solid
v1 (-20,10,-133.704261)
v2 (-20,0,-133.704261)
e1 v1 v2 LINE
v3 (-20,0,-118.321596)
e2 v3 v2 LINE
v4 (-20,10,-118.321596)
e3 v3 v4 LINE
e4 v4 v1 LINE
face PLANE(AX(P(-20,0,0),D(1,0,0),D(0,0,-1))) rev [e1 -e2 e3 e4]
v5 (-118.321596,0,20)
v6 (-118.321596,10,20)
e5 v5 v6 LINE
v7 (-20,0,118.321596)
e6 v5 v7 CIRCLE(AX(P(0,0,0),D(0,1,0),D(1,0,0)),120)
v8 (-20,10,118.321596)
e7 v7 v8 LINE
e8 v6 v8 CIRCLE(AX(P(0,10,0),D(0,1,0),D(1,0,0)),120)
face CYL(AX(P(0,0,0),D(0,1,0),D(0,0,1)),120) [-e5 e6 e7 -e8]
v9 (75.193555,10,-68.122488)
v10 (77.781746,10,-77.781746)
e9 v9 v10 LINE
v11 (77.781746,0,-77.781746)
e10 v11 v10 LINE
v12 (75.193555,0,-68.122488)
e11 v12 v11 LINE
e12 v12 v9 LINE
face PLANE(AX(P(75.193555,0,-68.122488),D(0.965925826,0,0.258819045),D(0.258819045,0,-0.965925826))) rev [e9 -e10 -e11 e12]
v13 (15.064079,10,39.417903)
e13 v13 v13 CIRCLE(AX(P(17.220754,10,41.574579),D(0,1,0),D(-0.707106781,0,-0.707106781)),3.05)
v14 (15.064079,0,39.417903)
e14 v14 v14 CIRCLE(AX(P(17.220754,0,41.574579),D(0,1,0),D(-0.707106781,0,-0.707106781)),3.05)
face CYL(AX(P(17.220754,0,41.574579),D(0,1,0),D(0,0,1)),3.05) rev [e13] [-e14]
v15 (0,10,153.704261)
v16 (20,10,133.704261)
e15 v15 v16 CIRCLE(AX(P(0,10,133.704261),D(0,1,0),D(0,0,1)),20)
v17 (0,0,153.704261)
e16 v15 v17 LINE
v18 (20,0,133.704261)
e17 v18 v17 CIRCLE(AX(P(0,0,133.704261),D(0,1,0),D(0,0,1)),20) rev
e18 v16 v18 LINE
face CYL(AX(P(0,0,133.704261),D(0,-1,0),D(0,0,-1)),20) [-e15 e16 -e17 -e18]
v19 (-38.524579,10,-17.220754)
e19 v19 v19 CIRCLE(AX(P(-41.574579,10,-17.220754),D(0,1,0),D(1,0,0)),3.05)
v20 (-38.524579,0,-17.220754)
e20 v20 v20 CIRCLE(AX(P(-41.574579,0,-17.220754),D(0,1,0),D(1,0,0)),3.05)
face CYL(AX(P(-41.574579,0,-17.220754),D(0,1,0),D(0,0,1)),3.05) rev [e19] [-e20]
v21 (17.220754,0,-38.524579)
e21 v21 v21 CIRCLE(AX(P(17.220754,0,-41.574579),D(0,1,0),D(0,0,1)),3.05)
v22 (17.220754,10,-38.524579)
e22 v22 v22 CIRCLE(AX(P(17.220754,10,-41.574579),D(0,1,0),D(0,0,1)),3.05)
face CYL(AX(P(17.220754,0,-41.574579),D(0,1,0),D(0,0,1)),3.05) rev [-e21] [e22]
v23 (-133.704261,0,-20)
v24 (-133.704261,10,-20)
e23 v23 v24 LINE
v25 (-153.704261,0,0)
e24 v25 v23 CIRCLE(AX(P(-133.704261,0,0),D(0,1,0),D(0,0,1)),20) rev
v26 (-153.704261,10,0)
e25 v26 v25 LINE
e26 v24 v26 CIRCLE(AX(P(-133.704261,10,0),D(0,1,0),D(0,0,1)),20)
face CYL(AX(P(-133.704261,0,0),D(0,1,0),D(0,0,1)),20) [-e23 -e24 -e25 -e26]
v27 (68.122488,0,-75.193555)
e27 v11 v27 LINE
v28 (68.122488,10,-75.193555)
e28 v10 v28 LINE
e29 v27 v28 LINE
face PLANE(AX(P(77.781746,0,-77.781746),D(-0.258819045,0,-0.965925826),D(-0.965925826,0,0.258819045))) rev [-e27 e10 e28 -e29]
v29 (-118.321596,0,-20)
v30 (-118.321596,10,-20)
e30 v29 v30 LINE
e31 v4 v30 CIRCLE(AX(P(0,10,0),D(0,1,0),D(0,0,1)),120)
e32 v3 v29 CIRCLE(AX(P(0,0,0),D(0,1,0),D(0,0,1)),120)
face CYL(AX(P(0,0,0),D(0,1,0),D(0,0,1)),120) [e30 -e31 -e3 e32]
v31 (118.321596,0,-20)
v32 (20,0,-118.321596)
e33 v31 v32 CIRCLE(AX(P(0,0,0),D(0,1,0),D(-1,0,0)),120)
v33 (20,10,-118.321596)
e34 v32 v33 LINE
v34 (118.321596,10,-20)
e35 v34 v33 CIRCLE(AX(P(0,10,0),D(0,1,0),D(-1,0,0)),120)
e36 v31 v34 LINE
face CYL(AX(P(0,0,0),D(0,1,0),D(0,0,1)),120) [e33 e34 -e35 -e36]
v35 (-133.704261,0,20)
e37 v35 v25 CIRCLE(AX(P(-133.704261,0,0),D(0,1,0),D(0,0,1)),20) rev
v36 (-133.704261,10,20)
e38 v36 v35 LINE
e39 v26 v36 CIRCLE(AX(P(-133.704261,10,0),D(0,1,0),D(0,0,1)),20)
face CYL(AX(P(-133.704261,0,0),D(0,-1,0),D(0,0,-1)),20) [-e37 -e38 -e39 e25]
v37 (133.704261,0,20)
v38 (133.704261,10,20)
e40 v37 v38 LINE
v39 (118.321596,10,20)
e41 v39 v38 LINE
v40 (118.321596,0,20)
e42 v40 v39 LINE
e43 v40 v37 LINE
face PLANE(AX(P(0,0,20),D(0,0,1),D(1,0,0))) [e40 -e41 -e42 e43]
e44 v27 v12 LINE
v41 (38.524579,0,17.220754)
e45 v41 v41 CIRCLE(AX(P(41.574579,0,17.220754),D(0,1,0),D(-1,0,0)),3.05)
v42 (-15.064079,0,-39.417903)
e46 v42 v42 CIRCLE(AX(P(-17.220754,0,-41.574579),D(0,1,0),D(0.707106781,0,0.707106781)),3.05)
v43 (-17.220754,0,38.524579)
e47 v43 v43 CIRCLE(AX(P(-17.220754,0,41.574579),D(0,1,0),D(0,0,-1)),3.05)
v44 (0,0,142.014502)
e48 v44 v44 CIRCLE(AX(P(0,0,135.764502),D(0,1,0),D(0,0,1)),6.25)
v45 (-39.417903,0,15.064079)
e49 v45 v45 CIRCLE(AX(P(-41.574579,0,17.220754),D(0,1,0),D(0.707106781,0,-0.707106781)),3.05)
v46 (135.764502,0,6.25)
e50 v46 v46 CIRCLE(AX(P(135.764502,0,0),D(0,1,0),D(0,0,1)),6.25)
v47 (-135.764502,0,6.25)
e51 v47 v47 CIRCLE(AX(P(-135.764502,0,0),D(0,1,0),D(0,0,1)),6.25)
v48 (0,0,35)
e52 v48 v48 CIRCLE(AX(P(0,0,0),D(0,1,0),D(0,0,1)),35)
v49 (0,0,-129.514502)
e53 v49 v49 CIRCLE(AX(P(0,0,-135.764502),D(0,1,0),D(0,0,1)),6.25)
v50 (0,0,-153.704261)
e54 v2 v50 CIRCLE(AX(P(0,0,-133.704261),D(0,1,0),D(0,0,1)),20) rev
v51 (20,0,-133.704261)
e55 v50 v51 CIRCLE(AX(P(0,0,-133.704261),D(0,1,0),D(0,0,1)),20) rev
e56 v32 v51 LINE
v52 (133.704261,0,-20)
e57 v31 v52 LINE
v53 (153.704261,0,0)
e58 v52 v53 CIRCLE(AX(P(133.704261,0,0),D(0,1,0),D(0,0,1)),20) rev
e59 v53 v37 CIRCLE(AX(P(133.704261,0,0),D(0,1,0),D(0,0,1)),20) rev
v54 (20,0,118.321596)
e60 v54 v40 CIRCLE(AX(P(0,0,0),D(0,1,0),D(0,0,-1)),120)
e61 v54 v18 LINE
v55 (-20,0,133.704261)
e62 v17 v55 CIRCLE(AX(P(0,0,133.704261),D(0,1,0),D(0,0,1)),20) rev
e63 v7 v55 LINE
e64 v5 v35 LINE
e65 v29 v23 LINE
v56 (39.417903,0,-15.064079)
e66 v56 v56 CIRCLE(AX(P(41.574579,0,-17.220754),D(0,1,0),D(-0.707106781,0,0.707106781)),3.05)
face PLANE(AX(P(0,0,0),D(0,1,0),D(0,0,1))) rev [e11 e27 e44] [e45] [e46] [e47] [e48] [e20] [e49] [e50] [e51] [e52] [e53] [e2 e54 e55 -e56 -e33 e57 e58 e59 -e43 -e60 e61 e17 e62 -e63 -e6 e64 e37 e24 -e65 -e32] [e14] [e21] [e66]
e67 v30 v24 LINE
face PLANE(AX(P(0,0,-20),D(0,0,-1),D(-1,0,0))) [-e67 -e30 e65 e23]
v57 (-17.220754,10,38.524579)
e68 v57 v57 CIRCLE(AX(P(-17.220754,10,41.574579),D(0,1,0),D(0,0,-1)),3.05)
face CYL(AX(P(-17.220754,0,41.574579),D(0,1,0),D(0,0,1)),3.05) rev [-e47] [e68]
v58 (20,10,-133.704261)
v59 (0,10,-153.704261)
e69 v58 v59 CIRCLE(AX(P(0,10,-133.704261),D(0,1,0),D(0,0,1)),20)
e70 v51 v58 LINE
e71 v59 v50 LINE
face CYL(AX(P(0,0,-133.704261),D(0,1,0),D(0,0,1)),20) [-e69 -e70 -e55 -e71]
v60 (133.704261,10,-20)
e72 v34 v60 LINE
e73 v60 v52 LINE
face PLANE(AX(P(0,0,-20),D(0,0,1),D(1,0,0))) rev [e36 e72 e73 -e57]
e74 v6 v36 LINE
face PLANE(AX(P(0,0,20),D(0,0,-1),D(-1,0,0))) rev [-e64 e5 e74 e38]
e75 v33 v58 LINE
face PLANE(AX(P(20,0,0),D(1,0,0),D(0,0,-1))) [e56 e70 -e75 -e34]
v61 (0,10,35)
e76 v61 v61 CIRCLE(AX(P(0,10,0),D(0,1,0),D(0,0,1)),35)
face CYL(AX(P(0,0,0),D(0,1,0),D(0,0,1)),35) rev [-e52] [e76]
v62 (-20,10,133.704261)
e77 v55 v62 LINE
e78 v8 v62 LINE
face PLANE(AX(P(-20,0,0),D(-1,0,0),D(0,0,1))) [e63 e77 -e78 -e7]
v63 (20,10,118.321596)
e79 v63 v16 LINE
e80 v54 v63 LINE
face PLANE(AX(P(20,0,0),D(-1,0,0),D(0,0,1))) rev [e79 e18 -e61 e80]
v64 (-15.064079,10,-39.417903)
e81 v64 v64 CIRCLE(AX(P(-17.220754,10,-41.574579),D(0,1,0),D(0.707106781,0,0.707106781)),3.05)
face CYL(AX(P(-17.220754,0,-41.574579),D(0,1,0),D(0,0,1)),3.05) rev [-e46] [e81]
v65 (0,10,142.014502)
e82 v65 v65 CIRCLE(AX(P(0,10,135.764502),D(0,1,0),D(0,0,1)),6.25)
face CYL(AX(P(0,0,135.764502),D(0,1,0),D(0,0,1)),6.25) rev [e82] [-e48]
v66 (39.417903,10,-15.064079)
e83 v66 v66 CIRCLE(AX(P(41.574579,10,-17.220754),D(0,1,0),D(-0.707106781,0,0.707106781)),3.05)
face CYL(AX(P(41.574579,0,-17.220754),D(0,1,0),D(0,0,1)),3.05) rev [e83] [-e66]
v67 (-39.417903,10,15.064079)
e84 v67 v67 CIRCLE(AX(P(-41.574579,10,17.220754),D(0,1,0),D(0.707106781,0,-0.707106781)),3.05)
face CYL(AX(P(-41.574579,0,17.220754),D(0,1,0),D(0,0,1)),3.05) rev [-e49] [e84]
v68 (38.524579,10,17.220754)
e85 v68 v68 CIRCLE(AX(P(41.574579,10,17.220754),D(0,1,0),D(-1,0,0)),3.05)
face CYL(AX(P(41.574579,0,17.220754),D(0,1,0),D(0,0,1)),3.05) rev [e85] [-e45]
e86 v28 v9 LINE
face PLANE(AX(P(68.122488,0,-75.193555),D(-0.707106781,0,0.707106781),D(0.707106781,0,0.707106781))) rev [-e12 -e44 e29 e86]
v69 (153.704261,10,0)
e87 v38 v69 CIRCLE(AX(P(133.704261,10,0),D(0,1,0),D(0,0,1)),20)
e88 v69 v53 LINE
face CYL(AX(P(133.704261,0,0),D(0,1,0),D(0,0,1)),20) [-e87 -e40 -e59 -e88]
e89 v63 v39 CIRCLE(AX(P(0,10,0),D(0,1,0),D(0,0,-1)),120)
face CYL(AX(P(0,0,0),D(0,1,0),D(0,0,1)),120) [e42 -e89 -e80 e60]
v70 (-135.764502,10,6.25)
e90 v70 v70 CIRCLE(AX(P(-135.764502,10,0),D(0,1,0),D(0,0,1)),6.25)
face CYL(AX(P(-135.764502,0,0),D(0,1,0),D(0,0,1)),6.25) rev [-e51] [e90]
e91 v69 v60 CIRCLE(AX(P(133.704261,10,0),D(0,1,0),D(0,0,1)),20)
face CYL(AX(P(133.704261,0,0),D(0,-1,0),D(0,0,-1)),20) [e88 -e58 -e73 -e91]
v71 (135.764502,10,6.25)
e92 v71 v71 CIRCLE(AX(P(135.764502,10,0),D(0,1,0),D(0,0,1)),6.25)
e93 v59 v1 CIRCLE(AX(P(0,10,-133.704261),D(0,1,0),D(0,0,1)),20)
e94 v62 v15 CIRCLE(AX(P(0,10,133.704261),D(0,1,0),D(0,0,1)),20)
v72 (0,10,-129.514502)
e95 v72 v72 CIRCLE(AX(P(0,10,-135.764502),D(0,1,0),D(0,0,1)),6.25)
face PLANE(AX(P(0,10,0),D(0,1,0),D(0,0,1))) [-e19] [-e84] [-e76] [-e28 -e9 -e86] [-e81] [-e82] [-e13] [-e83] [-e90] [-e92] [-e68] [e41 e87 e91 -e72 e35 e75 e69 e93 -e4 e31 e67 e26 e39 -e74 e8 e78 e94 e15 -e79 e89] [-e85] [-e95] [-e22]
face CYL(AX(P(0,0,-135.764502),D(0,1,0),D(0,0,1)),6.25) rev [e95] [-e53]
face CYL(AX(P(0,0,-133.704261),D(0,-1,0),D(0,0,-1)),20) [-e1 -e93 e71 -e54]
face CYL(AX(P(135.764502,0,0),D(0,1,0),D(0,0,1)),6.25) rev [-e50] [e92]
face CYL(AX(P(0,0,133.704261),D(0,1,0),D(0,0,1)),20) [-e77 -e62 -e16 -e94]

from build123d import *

# Parameters (mm, degrees)
SKETCH1_R           = 155
BOSS_EXTRUDE1_DEPTH = 10
SKETCH2_R           = 6.25
CUT_EXTRUDE1_DEPTH  = 220.431082575
SKETCH3_R           = 35
CUT_EXTRUDE2_DEPTH  = 220.431082575
SKETCH4_R           = 3.05
CUT_EXTRUDE3_DEPTH  = 220.431082575
CIRPATTERN1_COUNT   = 8
CUT_EXTRUDE4_START  = -10
CUT_EXTRUDE4_DEPTH  = 10
CIRPATTERN3_COUNT   = 4
FILLET1_R           = 20
CUT_EXTRUDE5_DEPTH  = 218.60055147


with BuildPart() as part:
    # Sketch1 → Boss-Extrude1 (new body)
    with BuildSketch(Plane(origin=(0, 0, 0), x_dir=(1, 0, 0), z_dir=(0, 1, 0))):
        with Locations(Location((0, 0, 0), (0, 0, 270))):
            Circle(SKETCH1_R)
    extrude(amount=BOSS_EXTRUDE1_DEPTH)

    # Sketch2 → Cut-Extrude1 (cut, through all)
    with BuildSketch(Plane(origin=(0, 10, 0), x_dir=(1, 0, 0), z_dir=(0, 1, 0))):
        with Locations(Location((-135.764501988, 0, 0), (0, 0, 270))):
            Circle(SKETCH2_R)
        with Locations(Location((0, -135.764501988, 0), (0, 0, 270))):
            Circle(SKETCH2_R)
        with Locations(Location((135.764501988, 0, 0), (0, 0, 270))):
            Circle(SKETCH2_R)
        with Locations(Location((0, 135.764501988, 0), (0, 0, 270))):
            Circle(SKETCH2_R)
    extrude(amount=-CUT_EXTRUDE1_DEPTH, mode=Mode.SUBTRACT)

    # Sketch3 → Cut-Extrude2 (cut, through all)
    with BuildSketch(Plane(origin=(0, 10, 0), x_dir=(1, 0, 0), z_dir=(0, 1, 0))):
        with Locations(Location((0, 0, 0), (0, 0, 270))):
            Circle(SKETCH3_R)
    extrude(amount=-CUT_EXTRUDE2_DEPTH, mode=Mode.SUBTRACT)

    # Sketch4 → Cut-Extrude3 (cut, through all)
    with BuildSketch(Plane(origin=(0, 10, 0), x_dir=(1, 0, 0), z_dir=(0, 1, 0))):
        with Locations(Location((17.220754456, 41.574578963, 0), (0, 0, 270))):
            Circle(SKETCH4_R)
    cut_extrude3 = extrude(amount=-CUT_EXTRUDE3_DEPTH, mode=Mode.SUBTRACT)

    # CirPattern1: Cut-Extrude3 ×8 about axis
    cirpattern1_axis = Axis((0, 0, 0), (0, 1, 0))
    for i in range(1, CIRPATTERN1_COUNT):
        add(cut_extrude3.rotate(cirpattern1_axis, i * 360 / CIRPATTERN1_COUNT), mode=Mode.SUBTRACT)

    # Sketch5 → Cut-Extrude4 (cut)
    with BuildSketch(Plane(origin=(0, 10, 0), x_dir=(1, 0, 0), z_dir=(0, 1, 0)).offset(CUT_EXTRUDE4_START)):
        with BuildLine():
            Line((-153.704261489, 20), (-118.321595662, 20))
            ThreePointArc((-118.321595662, 20), (-84.852813742, 84.852813742), (-20, 118.321595662))
            Line((-20, 118.321595662), (-20, 153.704261489))
            ThreePointArc((-20, 153.704261489), (-109.601551084, 109.601551084), (-153.704261489, 20))
        make_face()
        with BuildLine():
            Line((-153.704261489, -20), (-153.704261489, 20))
            ThreePointArc((-153.704261489, 20), (-155, 0), (-153.704261489, -20))
        make_face()
    cut_extrude4 = extrude(amount=CUT_EXTRUDE4_DEPTH, mode=Mode.SUBTRACT)

    # CirPattern3: Cut-Extrude4 ×4 about axis
    cirpattern3_axis = Axis((0, 0, 0), (0, 1, 0))
    for i in range(1, CIRPATTERN3_COUNT):
        add(cut_extrude4.rotate(cirpattern3_axis, i * 360 / CIRPATTERN3_COUNT), mode=Mode.SUBTRACT)

    # Fillet1
    fillet1_edges = [part.edges().sort_by_distance(p)[0] for p in [
        (-153.704261489, 5, -20),
        (-20, 5, 153.704261489),
        (153.704261489, 5, 20),
        (20, 5, -153.704261489),
        (-153.704261489, 5, 20),
        (20, 5, 153.704261489),
        (153.704261489, 5, -20),
        (-20, 5, -153.704261489),
    ]]
    fillet(fillet1_edges, radius=FILLET1_R - 0.0001)  # a hair under: the kernel refuses the full size

    # Sketch6 → Cut-Extrude5 (cut, through all)
    with BuildSketch(Plane(origin=(0, 10, 0), x_dir=(1, 0, 0), z_dir=(0, 1, 0))):
        Polygon((77.781745931, 77.781745931), (68.122487668, 75.193555479), (75.193555479, 68.122487668), align=None)
    extrude(amount=-CUT_EXTRUDE5_DEPTH, mode=Mode.SUBTRACT)


solid = part.part
